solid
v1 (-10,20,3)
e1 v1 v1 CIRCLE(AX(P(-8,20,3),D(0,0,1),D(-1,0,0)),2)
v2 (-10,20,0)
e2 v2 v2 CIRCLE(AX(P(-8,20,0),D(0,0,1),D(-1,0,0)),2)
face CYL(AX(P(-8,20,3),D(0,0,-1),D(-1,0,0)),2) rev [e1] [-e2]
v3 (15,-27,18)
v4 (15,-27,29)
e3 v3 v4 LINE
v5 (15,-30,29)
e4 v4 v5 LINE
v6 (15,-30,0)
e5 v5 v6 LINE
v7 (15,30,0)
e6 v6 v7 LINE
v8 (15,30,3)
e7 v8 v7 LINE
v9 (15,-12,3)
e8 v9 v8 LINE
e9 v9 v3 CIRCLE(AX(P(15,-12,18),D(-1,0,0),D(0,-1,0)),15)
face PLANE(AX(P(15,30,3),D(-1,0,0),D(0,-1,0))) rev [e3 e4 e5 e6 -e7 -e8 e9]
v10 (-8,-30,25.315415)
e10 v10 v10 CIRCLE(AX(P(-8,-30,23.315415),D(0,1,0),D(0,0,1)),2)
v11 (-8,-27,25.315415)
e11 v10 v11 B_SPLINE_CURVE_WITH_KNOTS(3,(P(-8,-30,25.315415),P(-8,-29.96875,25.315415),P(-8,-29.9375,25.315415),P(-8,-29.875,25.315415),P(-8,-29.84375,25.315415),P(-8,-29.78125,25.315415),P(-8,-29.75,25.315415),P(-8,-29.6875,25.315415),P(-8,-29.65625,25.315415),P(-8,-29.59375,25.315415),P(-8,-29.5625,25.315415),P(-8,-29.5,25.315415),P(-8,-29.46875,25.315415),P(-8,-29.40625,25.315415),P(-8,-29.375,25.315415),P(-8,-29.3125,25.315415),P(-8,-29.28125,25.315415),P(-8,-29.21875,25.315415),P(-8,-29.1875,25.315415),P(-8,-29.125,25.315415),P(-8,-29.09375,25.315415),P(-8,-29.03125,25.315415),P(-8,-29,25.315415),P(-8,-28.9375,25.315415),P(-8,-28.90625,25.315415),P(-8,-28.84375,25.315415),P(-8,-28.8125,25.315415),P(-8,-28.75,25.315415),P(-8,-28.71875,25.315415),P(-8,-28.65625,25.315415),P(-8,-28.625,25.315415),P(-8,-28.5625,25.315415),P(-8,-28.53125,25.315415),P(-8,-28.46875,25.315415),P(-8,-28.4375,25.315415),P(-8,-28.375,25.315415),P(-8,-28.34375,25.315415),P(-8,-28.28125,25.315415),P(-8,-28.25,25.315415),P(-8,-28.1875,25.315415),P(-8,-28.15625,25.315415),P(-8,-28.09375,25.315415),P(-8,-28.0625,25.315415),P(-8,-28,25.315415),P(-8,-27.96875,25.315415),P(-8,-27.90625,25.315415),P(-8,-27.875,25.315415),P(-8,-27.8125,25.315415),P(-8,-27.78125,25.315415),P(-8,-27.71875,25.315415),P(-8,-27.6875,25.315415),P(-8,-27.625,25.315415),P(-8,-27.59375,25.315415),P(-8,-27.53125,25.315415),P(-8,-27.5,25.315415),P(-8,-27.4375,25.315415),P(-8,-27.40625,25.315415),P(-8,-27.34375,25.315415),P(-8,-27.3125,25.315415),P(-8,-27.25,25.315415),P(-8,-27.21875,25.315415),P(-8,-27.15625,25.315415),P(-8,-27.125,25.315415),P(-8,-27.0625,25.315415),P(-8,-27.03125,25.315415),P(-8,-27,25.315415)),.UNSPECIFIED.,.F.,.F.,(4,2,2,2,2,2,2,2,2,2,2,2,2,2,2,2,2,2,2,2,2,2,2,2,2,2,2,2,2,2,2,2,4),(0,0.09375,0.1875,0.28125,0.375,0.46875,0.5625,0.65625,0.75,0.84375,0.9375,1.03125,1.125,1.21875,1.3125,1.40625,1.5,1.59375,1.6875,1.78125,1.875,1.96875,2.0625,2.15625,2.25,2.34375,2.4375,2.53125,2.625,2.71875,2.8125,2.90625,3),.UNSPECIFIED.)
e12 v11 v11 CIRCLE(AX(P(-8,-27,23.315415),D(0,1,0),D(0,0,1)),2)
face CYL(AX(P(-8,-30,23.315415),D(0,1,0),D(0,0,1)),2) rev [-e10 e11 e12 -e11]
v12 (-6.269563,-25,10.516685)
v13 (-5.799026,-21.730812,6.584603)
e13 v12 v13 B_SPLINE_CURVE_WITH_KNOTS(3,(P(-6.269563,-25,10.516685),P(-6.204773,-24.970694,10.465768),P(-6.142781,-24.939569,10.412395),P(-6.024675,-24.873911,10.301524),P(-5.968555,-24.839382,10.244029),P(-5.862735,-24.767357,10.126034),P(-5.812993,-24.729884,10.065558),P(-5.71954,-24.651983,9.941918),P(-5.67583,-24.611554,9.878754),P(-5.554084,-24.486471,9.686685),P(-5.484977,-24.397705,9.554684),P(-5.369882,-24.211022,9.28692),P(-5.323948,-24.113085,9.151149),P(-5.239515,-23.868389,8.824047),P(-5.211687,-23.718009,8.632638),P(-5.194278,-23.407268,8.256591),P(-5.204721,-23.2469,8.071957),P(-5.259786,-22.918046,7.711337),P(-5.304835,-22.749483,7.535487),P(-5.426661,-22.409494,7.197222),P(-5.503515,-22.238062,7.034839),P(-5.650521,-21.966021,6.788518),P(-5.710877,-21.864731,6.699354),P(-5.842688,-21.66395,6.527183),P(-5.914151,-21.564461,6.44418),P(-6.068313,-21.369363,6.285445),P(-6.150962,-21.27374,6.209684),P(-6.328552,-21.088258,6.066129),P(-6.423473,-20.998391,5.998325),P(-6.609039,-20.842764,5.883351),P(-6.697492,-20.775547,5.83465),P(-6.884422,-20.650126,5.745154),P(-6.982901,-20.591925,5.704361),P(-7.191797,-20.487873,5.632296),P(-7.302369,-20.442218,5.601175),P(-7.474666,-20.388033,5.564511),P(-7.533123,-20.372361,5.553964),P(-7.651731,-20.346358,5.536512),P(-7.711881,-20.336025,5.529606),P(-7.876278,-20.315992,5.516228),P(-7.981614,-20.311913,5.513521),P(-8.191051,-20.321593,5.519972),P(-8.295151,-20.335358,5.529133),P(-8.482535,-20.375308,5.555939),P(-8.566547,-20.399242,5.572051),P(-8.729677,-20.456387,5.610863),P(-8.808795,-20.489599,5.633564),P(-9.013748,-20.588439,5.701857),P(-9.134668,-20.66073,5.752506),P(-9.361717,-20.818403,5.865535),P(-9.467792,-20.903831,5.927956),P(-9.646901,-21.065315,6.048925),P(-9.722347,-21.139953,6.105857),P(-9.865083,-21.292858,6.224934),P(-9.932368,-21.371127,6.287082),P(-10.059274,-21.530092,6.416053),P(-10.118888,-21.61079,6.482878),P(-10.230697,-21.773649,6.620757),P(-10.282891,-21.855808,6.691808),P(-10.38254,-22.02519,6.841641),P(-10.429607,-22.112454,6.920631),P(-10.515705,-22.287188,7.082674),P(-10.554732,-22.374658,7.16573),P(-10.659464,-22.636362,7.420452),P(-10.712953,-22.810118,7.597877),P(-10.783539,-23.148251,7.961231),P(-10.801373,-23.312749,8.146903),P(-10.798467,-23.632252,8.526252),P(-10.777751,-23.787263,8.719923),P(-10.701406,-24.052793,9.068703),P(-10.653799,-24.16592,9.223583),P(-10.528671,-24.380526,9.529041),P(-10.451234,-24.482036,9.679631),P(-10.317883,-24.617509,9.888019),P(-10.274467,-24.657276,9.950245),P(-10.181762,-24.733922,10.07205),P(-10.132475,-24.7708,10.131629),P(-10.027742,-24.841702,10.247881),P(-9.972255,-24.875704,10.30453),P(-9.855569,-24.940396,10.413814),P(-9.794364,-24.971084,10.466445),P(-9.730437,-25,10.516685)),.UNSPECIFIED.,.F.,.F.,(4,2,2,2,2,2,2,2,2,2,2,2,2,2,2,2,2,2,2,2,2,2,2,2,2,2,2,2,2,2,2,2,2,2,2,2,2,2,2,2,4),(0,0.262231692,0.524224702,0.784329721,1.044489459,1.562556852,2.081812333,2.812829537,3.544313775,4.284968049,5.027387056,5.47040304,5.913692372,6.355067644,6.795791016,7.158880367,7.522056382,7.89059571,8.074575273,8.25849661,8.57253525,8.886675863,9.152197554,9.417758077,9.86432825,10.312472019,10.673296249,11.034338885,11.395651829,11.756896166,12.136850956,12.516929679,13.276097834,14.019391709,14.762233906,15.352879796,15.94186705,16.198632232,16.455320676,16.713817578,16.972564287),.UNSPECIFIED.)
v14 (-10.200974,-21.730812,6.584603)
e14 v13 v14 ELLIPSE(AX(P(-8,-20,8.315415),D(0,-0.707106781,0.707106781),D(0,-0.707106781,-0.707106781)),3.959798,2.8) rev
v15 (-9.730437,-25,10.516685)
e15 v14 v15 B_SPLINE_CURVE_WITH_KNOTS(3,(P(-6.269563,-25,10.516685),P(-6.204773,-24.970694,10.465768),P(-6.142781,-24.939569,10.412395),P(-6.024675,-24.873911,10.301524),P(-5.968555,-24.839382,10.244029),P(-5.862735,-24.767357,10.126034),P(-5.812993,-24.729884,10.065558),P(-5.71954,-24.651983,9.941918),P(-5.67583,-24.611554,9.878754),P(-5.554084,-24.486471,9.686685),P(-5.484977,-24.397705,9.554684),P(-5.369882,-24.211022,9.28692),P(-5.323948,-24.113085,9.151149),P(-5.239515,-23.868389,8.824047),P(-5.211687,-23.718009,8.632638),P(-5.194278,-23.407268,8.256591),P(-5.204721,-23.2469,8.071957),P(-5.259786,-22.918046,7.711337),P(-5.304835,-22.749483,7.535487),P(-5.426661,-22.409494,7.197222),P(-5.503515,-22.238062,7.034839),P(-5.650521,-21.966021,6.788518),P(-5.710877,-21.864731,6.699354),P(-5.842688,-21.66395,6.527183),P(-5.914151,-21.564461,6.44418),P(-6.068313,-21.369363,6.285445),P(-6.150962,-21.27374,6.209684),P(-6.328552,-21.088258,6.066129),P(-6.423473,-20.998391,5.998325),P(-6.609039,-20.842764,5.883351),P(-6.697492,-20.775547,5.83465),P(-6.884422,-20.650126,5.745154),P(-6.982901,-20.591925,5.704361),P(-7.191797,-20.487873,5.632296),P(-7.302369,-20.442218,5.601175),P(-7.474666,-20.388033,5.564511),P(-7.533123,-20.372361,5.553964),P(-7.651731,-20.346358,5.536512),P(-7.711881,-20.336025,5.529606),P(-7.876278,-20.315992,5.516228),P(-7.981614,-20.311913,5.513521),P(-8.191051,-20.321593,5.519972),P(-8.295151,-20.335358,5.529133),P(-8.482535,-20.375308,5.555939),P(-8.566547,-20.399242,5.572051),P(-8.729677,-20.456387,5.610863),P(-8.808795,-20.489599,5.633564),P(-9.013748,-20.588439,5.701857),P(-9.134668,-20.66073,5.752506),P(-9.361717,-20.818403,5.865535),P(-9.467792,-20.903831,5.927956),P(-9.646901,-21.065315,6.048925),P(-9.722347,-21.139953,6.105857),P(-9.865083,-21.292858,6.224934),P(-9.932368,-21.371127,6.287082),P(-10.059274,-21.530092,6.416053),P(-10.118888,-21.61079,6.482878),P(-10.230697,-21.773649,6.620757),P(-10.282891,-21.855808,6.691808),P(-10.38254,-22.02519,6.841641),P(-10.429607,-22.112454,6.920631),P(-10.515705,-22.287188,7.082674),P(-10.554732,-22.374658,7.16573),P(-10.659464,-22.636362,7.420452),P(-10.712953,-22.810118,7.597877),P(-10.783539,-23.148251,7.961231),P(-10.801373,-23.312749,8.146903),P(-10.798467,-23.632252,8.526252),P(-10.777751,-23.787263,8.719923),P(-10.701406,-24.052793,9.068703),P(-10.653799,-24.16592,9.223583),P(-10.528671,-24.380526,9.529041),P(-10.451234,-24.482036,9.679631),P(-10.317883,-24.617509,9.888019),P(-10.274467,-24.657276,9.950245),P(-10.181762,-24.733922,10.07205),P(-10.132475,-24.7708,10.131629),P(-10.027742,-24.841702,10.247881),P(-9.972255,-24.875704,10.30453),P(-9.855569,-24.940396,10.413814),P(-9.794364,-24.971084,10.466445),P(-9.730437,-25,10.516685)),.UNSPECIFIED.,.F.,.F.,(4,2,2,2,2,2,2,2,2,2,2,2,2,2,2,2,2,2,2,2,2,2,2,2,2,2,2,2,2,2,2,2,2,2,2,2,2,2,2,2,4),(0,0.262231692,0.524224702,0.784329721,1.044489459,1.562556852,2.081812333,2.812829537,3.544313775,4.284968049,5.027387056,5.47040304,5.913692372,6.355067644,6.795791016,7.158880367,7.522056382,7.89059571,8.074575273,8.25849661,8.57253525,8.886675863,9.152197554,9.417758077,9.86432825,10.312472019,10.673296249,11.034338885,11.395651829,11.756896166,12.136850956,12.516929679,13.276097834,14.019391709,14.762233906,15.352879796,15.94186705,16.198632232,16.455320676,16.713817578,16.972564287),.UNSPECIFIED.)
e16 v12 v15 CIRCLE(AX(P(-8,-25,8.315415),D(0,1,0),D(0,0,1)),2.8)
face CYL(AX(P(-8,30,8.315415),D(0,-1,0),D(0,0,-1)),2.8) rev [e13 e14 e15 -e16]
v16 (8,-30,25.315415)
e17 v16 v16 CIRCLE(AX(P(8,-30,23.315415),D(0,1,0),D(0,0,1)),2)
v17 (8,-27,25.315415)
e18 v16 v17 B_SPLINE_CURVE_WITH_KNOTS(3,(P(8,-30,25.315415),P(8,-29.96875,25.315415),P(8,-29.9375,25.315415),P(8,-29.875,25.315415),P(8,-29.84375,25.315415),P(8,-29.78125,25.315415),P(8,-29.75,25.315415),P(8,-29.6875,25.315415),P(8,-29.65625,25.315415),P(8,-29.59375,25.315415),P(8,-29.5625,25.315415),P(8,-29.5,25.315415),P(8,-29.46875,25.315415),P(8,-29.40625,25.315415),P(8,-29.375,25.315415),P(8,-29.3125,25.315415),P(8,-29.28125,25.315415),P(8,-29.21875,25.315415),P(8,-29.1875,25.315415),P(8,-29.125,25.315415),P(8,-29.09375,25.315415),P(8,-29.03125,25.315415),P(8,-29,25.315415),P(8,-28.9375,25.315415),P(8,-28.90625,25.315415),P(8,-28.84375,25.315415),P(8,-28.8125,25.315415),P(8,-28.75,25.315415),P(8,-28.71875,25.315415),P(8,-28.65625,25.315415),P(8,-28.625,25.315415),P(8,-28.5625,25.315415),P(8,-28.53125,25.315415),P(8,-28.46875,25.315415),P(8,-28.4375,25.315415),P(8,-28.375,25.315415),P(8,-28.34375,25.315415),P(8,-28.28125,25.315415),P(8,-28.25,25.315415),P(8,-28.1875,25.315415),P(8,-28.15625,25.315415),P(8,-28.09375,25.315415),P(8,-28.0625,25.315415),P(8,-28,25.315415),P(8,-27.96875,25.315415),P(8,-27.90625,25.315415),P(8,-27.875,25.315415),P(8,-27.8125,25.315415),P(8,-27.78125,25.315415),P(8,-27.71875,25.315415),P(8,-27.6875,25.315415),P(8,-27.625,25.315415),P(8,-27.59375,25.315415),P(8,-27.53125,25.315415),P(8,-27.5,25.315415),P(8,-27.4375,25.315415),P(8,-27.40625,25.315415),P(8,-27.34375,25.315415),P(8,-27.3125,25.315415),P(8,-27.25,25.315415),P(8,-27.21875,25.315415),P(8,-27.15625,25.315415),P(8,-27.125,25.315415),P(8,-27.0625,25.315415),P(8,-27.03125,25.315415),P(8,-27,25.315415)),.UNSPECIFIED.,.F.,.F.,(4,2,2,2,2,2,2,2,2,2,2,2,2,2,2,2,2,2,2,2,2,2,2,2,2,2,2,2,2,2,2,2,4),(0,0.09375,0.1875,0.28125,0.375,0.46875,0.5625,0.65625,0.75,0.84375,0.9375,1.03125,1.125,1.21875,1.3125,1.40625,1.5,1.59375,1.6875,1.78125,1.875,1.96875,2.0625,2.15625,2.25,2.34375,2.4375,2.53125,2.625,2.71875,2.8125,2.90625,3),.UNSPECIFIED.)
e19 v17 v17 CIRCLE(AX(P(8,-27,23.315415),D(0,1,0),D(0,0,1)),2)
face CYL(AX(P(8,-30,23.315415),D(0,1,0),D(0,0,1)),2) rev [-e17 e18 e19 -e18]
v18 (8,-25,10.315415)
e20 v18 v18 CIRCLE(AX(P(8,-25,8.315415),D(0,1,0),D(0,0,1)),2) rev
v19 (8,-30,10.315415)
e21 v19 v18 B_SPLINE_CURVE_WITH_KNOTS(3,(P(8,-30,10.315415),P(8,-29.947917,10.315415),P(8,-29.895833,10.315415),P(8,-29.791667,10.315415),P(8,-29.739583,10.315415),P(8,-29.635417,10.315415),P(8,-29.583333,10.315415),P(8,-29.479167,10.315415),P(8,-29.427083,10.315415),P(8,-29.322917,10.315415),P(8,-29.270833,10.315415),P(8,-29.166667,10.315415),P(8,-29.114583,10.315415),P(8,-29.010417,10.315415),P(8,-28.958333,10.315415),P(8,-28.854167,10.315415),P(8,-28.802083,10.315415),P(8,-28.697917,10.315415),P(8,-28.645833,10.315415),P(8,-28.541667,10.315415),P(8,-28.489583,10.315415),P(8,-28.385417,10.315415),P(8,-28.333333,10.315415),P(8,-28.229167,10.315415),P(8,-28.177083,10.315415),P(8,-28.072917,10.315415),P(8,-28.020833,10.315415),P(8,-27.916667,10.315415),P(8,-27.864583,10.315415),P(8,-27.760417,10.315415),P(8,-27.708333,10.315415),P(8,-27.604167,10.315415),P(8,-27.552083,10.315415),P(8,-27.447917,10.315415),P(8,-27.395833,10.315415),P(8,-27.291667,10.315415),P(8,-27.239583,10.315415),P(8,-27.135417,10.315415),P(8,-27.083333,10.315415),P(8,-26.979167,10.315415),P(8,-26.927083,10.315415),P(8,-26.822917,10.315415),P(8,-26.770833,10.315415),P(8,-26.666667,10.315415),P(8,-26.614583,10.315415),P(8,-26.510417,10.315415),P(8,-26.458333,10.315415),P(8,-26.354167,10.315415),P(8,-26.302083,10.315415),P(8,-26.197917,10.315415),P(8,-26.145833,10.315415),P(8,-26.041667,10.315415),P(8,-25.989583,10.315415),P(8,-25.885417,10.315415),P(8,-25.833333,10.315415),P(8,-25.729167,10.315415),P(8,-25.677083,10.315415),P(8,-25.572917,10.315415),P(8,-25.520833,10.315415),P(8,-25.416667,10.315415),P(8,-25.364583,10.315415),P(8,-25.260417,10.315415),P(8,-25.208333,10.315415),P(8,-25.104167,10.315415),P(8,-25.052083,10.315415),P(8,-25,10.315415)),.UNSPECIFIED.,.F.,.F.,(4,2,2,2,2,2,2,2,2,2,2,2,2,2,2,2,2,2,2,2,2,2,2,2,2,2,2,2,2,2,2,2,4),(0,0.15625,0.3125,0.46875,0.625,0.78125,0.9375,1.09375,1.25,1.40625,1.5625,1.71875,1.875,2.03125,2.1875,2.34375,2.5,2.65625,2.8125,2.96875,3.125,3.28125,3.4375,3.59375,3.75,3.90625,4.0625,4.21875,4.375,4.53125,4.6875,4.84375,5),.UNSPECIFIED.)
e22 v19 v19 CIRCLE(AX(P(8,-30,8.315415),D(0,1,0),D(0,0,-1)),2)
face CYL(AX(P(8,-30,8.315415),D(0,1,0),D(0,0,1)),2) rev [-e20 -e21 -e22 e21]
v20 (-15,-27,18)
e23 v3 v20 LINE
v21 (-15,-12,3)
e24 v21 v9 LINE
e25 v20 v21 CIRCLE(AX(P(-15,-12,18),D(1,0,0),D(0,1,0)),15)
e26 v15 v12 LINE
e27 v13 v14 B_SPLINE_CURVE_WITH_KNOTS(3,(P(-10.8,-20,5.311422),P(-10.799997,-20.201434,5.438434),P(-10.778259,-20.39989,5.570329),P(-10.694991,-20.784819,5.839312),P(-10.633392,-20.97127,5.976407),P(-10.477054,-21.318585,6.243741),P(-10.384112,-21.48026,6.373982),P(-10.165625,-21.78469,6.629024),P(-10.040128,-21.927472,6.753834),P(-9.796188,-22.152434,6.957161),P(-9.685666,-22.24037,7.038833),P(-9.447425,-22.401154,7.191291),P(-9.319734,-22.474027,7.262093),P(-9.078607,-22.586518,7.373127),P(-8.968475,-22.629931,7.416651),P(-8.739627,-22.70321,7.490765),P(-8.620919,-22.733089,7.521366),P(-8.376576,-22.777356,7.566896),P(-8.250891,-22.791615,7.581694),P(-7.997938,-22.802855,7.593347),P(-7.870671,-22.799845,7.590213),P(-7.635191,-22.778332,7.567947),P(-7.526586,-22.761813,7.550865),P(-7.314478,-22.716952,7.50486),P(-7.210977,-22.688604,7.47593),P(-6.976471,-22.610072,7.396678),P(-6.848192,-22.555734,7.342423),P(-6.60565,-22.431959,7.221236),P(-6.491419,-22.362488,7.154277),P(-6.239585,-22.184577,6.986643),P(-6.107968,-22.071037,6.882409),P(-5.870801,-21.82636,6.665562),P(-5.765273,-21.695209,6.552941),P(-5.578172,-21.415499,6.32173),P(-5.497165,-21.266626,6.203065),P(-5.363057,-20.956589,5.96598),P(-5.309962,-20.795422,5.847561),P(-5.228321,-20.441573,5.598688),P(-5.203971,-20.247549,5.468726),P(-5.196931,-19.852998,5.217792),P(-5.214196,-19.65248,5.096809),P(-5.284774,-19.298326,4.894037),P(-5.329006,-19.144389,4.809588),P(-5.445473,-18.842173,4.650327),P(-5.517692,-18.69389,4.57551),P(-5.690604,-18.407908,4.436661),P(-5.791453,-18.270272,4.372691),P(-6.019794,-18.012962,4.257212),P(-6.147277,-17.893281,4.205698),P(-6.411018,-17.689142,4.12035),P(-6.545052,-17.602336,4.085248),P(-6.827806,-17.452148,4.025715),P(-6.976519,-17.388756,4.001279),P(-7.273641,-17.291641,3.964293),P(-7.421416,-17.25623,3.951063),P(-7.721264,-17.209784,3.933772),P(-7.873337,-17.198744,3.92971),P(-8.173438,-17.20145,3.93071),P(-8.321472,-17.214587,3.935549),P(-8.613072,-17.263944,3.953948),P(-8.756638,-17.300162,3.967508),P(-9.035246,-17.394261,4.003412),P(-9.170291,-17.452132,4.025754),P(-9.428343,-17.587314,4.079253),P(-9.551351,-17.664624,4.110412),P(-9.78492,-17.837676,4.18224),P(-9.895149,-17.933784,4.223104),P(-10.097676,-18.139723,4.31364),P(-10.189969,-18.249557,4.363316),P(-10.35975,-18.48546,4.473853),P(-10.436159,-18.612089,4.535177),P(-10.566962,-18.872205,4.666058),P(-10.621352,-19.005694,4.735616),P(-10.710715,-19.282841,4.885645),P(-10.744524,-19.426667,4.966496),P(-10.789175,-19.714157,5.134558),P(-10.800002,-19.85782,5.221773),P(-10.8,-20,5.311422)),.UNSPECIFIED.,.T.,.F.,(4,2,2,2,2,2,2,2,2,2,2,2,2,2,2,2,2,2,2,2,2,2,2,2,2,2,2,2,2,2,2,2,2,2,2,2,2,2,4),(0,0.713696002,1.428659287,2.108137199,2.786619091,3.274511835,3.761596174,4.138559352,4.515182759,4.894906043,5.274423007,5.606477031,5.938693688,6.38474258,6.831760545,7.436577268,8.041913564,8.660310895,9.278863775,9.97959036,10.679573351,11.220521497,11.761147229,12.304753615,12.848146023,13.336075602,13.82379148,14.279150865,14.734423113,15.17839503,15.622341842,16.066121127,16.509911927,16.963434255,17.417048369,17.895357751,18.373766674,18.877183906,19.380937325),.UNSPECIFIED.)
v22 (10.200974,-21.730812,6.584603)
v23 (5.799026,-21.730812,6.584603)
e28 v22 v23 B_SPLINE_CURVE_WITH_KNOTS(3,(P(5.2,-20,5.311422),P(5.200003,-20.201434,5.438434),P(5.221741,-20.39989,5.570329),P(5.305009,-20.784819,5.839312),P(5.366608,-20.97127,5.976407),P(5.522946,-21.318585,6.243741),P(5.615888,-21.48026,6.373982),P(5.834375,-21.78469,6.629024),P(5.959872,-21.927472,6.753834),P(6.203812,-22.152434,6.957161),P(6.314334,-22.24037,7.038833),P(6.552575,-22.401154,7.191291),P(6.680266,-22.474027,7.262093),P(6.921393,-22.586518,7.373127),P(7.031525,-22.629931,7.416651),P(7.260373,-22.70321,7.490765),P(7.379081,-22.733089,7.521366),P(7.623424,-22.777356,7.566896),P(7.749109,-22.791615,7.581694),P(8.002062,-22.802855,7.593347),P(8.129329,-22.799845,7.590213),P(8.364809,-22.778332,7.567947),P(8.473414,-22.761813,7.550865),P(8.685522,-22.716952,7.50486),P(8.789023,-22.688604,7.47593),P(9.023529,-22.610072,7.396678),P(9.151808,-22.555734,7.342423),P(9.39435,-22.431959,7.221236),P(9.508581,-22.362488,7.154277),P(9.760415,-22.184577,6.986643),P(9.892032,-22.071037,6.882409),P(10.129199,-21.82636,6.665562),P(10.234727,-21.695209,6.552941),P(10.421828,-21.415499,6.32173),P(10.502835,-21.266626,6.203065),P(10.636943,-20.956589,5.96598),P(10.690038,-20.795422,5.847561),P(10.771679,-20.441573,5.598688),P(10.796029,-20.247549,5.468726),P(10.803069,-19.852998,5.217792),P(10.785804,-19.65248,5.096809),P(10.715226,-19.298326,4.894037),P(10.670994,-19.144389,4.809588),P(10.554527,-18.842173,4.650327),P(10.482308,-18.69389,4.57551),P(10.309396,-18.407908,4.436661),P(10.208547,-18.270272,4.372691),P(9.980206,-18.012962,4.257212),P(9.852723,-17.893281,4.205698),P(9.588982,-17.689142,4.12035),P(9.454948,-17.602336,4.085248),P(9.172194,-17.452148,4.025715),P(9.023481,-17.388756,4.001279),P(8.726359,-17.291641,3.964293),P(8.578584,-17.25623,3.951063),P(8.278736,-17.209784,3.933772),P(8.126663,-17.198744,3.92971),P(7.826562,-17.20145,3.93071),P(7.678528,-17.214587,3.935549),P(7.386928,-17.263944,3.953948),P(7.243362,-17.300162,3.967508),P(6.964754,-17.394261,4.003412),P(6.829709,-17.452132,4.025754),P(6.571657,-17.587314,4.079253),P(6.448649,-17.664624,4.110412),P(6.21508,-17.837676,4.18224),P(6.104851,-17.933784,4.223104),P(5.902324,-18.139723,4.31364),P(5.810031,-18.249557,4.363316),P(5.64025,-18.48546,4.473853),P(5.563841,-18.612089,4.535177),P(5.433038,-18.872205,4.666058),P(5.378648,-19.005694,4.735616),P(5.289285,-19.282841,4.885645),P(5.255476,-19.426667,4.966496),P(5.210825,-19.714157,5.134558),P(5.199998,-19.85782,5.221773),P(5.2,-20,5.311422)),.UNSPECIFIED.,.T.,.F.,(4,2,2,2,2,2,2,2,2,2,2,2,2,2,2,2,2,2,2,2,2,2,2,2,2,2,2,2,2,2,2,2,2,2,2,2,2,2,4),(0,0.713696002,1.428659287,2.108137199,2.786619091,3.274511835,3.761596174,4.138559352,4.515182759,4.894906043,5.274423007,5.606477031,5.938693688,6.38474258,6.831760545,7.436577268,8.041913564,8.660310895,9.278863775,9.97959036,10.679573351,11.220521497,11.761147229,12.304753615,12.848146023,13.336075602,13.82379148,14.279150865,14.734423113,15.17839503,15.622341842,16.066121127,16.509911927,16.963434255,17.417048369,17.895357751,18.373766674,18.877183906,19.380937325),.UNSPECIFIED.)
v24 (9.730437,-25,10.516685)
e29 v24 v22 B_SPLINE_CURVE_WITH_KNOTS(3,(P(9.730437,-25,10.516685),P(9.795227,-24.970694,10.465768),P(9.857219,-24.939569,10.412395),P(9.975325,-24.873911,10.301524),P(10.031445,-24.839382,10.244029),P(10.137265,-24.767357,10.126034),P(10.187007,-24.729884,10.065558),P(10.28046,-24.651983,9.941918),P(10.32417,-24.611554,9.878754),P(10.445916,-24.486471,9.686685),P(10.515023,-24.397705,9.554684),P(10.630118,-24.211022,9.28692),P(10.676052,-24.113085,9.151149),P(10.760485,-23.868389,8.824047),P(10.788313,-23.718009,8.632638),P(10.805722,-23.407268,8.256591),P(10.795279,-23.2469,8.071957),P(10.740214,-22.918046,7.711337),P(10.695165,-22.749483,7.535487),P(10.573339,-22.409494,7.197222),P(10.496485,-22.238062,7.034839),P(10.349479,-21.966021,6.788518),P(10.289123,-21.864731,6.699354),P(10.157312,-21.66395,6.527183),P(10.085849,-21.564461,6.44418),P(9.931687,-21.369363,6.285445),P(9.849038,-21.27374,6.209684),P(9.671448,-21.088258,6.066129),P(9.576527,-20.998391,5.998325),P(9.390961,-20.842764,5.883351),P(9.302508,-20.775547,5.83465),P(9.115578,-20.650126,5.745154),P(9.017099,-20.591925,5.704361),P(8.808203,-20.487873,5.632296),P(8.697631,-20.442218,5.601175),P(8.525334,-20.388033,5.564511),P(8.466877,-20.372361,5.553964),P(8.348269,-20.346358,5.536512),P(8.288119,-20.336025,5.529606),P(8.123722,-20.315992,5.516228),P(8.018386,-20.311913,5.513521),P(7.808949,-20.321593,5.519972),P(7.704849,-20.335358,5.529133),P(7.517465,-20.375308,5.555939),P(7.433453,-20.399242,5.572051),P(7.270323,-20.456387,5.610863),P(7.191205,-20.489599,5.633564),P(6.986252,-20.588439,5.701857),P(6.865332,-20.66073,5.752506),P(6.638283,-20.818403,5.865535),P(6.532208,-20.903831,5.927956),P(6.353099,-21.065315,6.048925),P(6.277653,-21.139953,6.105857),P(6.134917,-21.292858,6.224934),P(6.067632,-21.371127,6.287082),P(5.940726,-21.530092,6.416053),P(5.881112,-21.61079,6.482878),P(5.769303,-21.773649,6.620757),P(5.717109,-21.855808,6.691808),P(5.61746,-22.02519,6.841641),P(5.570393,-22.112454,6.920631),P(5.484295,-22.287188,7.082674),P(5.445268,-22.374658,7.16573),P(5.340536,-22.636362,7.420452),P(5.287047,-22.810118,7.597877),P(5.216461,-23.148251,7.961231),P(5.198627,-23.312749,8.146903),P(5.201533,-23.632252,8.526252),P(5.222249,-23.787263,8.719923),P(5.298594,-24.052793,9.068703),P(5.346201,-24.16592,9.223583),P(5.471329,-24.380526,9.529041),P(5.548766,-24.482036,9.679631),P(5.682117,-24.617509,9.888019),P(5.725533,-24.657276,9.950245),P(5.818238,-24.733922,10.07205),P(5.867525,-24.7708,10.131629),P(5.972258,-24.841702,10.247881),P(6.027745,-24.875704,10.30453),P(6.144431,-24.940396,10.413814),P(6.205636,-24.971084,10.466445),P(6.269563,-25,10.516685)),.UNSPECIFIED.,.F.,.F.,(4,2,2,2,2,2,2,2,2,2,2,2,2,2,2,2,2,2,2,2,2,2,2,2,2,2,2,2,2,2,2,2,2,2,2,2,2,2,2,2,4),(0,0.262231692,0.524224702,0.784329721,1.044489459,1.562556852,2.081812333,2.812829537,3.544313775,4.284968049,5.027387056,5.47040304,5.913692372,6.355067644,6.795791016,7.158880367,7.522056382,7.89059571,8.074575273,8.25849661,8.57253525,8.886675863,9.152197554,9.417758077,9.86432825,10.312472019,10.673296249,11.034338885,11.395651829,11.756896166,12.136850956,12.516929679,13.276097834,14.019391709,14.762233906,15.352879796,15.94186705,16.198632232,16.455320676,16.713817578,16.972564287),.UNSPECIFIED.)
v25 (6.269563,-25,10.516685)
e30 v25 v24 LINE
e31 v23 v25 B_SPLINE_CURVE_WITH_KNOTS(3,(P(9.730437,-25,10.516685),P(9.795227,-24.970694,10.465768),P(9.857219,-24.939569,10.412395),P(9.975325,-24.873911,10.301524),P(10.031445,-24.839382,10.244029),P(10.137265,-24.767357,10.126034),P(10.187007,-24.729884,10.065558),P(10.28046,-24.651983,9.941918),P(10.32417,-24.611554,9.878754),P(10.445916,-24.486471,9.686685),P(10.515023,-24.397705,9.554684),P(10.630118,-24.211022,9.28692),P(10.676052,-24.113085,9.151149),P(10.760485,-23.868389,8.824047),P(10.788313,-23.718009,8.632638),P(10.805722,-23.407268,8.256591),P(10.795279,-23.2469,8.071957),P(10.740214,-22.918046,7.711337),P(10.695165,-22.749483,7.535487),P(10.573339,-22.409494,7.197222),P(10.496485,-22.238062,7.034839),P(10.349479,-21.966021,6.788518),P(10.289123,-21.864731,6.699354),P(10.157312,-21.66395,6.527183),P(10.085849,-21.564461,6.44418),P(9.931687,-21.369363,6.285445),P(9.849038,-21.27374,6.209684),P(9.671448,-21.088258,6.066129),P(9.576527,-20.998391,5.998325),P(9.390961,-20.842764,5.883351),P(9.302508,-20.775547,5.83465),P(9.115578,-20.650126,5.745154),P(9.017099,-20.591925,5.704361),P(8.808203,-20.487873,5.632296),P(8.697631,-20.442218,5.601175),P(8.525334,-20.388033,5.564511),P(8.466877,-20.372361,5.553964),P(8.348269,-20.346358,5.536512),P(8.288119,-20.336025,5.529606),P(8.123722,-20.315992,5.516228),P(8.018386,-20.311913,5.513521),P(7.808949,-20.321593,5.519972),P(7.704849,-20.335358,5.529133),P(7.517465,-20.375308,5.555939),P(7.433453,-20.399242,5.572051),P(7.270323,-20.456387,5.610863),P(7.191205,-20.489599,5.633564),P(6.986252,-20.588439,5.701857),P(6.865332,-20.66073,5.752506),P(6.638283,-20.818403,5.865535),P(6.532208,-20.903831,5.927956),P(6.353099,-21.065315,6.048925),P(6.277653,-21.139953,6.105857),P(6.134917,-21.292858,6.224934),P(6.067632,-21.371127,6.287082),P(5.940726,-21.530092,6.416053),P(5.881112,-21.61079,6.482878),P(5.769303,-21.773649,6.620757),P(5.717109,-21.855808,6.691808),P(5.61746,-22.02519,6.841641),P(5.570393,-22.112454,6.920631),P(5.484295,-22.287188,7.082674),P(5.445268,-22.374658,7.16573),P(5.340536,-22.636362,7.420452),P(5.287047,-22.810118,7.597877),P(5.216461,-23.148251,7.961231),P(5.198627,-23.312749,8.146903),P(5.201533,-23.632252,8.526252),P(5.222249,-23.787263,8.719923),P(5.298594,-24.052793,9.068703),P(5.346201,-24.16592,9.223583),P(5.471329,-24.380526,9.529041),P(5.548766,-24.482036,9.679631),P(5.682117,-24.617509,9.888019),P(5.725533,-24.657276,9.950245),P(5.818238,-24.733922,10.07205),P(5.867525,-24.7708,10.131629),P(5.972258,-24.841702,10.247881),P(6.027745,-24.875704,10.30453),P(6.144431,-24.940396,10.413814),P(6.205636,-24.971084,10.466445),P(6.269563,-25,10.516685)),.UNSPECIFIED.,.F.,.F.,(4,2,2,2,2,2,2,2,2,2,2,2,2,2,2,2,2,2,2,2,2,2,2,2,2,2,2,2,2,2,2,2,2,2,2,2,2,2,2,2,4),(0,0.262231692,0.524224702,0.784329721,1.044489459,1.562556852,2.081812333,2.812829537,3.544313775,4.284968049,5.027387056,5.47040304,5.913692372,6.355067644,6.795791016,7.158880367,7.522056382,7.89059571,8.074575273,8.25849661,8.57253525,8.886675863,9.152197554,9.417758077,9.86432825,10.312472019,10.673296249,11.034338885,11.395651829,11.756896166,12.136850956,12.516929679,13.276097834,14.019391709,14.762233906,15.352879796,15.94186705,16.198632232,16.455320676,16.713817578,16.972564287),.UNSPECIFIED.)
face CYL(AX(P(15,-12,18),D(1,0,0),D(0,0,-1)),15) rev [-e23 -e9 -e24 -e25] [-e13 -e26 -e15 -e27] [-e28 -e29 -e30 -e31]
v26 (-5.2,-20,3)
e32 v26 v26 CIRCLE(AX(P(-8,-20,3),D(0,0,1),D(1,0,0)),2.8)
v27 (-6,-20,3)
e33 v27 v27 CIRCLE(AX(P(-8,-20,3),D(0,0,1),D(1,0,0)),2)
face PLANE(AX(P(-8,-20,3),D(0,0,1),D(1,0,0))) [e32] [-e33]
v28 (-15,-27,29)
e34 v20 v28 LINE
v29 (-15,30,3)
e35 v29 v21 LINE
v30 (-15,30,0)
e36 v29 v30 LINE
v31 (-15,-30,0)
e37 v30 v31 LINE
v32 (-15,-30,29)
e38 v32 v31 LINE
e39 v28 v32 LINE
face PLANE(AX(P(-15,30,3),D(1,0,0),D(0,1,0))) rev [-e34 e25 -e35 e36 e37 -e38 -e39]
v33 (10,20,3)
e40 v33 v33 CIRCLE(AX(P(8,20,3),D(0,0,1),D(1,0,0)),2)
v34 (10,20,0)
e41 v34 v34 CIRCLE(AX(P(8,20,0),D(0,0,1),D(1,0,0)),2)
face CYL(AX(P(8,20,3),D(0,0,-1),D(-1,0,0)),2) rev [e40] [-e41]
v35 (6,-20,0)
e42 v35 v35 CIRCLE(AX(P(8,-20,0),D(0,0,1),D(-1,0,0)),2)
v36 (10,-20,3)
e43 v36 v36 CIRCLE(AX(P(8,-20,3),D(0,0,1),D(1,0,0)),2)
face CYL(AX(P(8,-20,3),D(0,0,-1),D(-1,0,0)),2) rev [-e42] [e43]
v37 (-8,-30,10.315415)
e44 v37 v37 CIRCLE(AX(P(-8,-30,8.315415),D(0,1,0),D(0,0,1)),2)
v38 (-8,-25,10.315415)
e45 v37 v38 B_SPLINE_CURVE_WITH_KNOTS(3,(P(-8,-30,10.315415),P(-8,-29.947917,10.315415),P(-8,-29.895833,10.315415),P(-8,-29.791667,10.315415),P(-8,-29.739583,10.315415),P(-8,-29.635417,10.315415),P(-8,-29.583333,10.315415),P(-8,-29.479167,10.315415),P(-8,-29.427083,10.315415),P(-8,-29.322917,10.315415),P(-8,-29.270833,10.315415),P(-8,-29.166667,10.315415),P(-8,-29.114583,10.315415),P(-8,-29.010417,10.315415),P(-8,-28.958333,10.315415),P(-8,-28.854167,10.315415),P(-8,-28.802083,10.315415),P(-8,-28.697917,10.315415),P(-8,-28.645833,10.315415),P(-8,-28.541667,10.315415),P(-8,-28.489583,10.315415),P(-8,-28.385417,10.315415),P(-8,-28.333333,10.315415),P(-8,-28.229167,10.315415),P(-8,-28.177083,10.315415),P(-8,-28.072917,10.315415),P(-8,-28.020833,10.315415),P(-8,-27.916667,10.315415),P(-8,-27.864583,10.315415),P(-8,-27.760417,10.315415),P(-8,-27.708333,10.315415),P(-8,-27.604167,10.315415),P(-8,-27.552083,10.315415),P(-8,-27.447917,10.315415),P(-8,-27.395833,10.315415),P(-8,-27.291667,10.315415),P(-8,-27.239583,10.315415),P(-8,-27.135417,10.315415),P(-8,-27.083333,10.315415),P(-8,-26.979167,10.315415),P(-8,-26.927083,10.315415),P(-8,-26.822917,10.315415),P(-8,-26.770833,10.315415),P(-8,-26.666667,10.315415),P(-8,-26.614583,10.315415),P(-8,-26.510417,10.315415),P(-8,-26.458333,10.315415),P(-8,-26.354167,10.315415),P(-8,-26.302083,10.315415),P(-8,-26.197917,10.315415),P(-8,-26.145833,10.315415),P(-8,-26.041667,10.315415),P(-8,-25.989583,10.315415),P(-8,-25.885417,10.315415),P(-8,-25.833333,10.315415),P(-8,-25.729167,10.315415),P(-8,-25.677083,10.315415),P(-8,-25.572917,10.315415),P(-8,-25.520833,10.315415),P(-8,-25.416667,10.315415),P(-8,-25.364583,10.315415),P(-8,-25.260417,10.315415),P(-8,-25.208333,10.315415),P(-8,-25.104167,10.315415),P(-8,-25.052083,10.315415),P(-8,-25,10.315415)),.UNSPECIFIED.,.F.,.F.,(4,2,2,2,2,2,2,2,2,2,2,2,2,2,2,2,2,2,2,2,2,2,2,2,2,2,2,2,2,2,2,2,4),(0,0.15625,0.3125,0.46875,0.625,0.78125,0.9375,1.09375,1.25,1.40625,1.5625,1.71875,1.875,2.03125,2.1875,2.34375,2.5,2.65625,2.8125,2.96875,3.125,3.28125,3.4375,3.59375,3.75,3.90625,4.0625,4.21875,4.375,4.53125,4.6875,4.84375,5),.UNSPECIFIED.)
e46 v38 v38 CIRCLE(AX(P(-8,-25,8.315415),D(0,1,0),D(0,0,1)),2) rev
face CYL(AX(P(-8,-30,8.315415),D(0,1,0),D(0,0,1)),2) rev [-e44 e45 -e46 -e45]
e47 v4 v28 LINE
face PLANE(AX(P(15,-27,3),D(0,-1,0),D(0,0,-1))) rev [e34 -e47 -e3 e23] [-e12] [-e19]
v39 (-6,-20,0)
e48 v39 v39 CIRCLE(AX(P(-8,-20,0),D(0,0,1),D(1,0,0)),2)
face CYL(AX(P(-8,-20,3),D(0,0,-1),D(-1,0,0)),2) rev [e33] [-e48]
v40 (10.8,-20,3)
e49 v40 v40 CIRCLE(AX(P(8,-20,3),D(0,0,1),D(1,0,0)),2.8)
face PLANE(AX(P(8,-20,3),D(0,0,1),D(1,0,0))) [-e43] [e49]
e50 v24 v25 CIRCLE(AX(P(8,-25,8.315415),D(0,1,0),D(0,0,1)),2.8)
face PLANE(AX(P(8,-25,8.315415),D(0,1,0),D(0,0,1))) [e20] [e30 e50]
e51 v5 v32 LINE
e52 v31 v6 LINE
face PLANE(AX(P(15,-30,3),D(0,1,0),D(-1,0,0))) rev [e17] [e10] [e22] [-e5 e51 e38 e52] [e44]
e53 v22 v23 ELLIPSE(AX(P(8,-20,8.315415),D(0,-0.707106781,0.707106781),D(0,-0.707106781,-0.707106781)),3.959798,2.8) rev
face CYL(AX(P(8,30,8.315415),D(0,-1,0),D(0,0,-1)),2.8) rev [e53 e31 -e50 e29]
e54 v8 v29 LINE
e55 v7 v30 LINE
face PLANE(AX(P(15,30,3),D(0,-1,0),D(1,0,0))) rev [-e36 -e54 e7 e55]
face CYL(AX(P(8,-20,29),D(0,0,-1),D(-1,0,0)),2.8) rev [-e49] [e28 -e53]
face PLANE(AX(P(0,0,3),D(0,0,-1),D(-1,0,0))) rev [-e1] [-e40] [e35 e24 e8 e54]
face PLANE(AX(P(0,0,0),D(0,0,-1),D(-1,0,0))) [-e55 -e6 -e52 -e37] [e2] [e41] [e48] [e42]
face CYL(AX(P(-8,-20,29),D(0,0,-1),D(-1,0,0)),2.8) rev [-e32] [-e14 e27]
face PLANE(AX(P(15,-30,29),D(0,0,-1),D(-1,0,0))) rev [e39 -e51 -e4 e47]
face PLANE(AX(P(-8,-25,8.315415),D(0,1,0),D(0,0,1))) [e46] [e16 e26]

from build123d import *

# Parameters (mm, degrees)
SKETCH1_W           = 30
SKETCH1_H           = 60
SKETCH1_R           = 2
BOSS_EXTRUDE1_DEPTH = 3
SKETCH2_W           = 26
SKETCH2_H           = 3
BOSS_EXTRUDE2_DEPTH = 15
SKETCH3_R           = 2
CUT_EXTRUDE1_DEPTH  = 66.6886596
FILLET1_R           = 15
CUT_EXTRUDE2_START  = 2
SKETCH4_R           = 2.8
CUT_EXTRUDE2_DEPTH  = 64.688659622
SKETCH5_R           = 2.8
CUT_EXTRUDE3_DEPTH  = 43.438190383


with BuildPart() as part:
    # Sketch1 → Boss-Extrude1 (new body)
    with BuildSketch(Plane.XY):
        Rectangle(SKETCH1_W, SKETCH1_H)
        with Locations((8, 20)):
            Circle(SKETCH1_R, mode=Mode.SUBTRACT)
        with Locations(Location((8, -20, 0), (0, 0, 180))):
            Circle(SKETCH1_R, mode=Mode.SUBTRACT)
        with Locations(Location((-8, 20, 0), (0, 0, 180))):
            Circle(SKETCH1_R, mode=Mode.SUBTRACT)
        with Locations((-8, -20)):
            Circle(SKETCH1_R, mode=Mode.SUBTRACT)
    extrude(amount=BOSS_EXTRUDE1_DEPTH)

    # Sketch2 → Boss-Extrude2 (add, symmetric)
    with BuildSketch(Plane(origin=(0, 0, 0), x_dir=(0, 0, -1), z_dir=(1, 0, 0))):
        with Locations((-16, -28.5)):
            Rectangle(SKETCH2_W, SKETCH2_H)
    extrude(amount=BOSS_EXTRUDE2_DEPTH, both=True)

    # Sketch3 → Cut-Extrude1 (cut, through all)
    with BuildSketch(Plane(origin=(0, -27, 0), x_dir=(1, 0, 0), z_dir=(0, 1, 0))):
        with Locations(Location((-8, -8.31541538, 0), (0, 0, 270))):
            Circle(SKETCH3_R)
        with Locations(Location((8, -8.31541538, 0), (0, 0, 270))):
            Circle(SKETCH3_R)
        with Locations(Location((-8, -23.31541538, 0), (0, 0, 270))):
            Circle(SKETCH3_R)
        with Locations(Location((8, -23.31541538, 0), (0, 0, 270))):
            Circle(SKETCH3_R)
    extrude(amount=-CUT_EXTRUDE1_DEPTH, mode=Mode.SUBTRACT)

    # Fillet1
    # the kernel refuses this fillet: 15 mm, written as the material it adds along each edge
    with BuildSketch(Plane(origin=(-15, -27, 3), x_dir=(0, 1, 0), z_dir=(1, 0, 0))) as fillet1_piece_1_section:
        with BuildLine():
            CenterArc((FILLET1_R, FILLET1_R), FILLET1_R, 180, 90)
            Line((0, FILLET1_R), (0, 0))
            Line((0, 0), (FILLET1_R, 0))
        make_face()
    fillet1_piece_1 = extrude(amount=30, mode=Mode.PRIVATE)
    fillet1_piece_1 = fillet1_piece_1 - Plane(origin=(-8, -20, 6.3866805), x_dir=(1, 0, 0), z_dir=(0, 0, -1)) * Cylinder(2, 120, mode=Mode.PRIVATE)
    fillet1_piece_1 = fillet1_piece_1 - Plane(origin=(8, -20, 6.3866805), x_dir=(-1, 0, 0), z_dir=(0, 0, -1)) * Cylinder(2, 120, mode=Mode.PRIVATE)
    fillet1_piece_1 = fillet1_piece_1 - Plane(origin=(-8, -23.64475421, 8.31541538), x_dir=(0, 0, 1), z_dir=(0, 1, 0)) * Cylinder(2, 120, mode=Mode.PRIVATE)
    fillet1_piece_1 = fillet1_piece_1 - Plane(origin=(8, -23.64475421, 8.31541538), x_dir=(0, 0, 1), z_dir=(0, 1, 0)) * Cylinder(2, 120, mode=Mode.PRIVATE)
    add(fillet1_piece_1)

    # Sketch4 → Cut-Extrude2 (cut, through all)
    with BuildSketch(Plane(origin=(0, -27, 0), x_dir=(1, 0, 0), z_dir=(0, 1, 0)).offset(CUT_EXTRUDE2_START)):
        with Locations((-8, -8.31541538)):
            Circle(SKETCH4_R)
        with Locations((8, -8.31541538)):
            Circle(SKETCH4_R)
    extrude(amount=CUT_EXTRUDE2_DEPTH, mode=Mode.SUBTRACT)

    # Sketch5 → Cut-Extrude3 (cut, through all)
    with BuildSketch(Plane.XY.offset(3)):
        with Locations(Location((-8, -20, 0), (0, 0, 218.180965893))):
            Circle(SKETCH5_R)
        with Locations(Location((8, -20, 0), (0, 0, 218.180965893))):
            Circle(SKETCH5_R)
    extrude(amount=CUT_EXTRUDE3_DEPTH, mode=Mode.SUBTRACT)


solid = part.part
